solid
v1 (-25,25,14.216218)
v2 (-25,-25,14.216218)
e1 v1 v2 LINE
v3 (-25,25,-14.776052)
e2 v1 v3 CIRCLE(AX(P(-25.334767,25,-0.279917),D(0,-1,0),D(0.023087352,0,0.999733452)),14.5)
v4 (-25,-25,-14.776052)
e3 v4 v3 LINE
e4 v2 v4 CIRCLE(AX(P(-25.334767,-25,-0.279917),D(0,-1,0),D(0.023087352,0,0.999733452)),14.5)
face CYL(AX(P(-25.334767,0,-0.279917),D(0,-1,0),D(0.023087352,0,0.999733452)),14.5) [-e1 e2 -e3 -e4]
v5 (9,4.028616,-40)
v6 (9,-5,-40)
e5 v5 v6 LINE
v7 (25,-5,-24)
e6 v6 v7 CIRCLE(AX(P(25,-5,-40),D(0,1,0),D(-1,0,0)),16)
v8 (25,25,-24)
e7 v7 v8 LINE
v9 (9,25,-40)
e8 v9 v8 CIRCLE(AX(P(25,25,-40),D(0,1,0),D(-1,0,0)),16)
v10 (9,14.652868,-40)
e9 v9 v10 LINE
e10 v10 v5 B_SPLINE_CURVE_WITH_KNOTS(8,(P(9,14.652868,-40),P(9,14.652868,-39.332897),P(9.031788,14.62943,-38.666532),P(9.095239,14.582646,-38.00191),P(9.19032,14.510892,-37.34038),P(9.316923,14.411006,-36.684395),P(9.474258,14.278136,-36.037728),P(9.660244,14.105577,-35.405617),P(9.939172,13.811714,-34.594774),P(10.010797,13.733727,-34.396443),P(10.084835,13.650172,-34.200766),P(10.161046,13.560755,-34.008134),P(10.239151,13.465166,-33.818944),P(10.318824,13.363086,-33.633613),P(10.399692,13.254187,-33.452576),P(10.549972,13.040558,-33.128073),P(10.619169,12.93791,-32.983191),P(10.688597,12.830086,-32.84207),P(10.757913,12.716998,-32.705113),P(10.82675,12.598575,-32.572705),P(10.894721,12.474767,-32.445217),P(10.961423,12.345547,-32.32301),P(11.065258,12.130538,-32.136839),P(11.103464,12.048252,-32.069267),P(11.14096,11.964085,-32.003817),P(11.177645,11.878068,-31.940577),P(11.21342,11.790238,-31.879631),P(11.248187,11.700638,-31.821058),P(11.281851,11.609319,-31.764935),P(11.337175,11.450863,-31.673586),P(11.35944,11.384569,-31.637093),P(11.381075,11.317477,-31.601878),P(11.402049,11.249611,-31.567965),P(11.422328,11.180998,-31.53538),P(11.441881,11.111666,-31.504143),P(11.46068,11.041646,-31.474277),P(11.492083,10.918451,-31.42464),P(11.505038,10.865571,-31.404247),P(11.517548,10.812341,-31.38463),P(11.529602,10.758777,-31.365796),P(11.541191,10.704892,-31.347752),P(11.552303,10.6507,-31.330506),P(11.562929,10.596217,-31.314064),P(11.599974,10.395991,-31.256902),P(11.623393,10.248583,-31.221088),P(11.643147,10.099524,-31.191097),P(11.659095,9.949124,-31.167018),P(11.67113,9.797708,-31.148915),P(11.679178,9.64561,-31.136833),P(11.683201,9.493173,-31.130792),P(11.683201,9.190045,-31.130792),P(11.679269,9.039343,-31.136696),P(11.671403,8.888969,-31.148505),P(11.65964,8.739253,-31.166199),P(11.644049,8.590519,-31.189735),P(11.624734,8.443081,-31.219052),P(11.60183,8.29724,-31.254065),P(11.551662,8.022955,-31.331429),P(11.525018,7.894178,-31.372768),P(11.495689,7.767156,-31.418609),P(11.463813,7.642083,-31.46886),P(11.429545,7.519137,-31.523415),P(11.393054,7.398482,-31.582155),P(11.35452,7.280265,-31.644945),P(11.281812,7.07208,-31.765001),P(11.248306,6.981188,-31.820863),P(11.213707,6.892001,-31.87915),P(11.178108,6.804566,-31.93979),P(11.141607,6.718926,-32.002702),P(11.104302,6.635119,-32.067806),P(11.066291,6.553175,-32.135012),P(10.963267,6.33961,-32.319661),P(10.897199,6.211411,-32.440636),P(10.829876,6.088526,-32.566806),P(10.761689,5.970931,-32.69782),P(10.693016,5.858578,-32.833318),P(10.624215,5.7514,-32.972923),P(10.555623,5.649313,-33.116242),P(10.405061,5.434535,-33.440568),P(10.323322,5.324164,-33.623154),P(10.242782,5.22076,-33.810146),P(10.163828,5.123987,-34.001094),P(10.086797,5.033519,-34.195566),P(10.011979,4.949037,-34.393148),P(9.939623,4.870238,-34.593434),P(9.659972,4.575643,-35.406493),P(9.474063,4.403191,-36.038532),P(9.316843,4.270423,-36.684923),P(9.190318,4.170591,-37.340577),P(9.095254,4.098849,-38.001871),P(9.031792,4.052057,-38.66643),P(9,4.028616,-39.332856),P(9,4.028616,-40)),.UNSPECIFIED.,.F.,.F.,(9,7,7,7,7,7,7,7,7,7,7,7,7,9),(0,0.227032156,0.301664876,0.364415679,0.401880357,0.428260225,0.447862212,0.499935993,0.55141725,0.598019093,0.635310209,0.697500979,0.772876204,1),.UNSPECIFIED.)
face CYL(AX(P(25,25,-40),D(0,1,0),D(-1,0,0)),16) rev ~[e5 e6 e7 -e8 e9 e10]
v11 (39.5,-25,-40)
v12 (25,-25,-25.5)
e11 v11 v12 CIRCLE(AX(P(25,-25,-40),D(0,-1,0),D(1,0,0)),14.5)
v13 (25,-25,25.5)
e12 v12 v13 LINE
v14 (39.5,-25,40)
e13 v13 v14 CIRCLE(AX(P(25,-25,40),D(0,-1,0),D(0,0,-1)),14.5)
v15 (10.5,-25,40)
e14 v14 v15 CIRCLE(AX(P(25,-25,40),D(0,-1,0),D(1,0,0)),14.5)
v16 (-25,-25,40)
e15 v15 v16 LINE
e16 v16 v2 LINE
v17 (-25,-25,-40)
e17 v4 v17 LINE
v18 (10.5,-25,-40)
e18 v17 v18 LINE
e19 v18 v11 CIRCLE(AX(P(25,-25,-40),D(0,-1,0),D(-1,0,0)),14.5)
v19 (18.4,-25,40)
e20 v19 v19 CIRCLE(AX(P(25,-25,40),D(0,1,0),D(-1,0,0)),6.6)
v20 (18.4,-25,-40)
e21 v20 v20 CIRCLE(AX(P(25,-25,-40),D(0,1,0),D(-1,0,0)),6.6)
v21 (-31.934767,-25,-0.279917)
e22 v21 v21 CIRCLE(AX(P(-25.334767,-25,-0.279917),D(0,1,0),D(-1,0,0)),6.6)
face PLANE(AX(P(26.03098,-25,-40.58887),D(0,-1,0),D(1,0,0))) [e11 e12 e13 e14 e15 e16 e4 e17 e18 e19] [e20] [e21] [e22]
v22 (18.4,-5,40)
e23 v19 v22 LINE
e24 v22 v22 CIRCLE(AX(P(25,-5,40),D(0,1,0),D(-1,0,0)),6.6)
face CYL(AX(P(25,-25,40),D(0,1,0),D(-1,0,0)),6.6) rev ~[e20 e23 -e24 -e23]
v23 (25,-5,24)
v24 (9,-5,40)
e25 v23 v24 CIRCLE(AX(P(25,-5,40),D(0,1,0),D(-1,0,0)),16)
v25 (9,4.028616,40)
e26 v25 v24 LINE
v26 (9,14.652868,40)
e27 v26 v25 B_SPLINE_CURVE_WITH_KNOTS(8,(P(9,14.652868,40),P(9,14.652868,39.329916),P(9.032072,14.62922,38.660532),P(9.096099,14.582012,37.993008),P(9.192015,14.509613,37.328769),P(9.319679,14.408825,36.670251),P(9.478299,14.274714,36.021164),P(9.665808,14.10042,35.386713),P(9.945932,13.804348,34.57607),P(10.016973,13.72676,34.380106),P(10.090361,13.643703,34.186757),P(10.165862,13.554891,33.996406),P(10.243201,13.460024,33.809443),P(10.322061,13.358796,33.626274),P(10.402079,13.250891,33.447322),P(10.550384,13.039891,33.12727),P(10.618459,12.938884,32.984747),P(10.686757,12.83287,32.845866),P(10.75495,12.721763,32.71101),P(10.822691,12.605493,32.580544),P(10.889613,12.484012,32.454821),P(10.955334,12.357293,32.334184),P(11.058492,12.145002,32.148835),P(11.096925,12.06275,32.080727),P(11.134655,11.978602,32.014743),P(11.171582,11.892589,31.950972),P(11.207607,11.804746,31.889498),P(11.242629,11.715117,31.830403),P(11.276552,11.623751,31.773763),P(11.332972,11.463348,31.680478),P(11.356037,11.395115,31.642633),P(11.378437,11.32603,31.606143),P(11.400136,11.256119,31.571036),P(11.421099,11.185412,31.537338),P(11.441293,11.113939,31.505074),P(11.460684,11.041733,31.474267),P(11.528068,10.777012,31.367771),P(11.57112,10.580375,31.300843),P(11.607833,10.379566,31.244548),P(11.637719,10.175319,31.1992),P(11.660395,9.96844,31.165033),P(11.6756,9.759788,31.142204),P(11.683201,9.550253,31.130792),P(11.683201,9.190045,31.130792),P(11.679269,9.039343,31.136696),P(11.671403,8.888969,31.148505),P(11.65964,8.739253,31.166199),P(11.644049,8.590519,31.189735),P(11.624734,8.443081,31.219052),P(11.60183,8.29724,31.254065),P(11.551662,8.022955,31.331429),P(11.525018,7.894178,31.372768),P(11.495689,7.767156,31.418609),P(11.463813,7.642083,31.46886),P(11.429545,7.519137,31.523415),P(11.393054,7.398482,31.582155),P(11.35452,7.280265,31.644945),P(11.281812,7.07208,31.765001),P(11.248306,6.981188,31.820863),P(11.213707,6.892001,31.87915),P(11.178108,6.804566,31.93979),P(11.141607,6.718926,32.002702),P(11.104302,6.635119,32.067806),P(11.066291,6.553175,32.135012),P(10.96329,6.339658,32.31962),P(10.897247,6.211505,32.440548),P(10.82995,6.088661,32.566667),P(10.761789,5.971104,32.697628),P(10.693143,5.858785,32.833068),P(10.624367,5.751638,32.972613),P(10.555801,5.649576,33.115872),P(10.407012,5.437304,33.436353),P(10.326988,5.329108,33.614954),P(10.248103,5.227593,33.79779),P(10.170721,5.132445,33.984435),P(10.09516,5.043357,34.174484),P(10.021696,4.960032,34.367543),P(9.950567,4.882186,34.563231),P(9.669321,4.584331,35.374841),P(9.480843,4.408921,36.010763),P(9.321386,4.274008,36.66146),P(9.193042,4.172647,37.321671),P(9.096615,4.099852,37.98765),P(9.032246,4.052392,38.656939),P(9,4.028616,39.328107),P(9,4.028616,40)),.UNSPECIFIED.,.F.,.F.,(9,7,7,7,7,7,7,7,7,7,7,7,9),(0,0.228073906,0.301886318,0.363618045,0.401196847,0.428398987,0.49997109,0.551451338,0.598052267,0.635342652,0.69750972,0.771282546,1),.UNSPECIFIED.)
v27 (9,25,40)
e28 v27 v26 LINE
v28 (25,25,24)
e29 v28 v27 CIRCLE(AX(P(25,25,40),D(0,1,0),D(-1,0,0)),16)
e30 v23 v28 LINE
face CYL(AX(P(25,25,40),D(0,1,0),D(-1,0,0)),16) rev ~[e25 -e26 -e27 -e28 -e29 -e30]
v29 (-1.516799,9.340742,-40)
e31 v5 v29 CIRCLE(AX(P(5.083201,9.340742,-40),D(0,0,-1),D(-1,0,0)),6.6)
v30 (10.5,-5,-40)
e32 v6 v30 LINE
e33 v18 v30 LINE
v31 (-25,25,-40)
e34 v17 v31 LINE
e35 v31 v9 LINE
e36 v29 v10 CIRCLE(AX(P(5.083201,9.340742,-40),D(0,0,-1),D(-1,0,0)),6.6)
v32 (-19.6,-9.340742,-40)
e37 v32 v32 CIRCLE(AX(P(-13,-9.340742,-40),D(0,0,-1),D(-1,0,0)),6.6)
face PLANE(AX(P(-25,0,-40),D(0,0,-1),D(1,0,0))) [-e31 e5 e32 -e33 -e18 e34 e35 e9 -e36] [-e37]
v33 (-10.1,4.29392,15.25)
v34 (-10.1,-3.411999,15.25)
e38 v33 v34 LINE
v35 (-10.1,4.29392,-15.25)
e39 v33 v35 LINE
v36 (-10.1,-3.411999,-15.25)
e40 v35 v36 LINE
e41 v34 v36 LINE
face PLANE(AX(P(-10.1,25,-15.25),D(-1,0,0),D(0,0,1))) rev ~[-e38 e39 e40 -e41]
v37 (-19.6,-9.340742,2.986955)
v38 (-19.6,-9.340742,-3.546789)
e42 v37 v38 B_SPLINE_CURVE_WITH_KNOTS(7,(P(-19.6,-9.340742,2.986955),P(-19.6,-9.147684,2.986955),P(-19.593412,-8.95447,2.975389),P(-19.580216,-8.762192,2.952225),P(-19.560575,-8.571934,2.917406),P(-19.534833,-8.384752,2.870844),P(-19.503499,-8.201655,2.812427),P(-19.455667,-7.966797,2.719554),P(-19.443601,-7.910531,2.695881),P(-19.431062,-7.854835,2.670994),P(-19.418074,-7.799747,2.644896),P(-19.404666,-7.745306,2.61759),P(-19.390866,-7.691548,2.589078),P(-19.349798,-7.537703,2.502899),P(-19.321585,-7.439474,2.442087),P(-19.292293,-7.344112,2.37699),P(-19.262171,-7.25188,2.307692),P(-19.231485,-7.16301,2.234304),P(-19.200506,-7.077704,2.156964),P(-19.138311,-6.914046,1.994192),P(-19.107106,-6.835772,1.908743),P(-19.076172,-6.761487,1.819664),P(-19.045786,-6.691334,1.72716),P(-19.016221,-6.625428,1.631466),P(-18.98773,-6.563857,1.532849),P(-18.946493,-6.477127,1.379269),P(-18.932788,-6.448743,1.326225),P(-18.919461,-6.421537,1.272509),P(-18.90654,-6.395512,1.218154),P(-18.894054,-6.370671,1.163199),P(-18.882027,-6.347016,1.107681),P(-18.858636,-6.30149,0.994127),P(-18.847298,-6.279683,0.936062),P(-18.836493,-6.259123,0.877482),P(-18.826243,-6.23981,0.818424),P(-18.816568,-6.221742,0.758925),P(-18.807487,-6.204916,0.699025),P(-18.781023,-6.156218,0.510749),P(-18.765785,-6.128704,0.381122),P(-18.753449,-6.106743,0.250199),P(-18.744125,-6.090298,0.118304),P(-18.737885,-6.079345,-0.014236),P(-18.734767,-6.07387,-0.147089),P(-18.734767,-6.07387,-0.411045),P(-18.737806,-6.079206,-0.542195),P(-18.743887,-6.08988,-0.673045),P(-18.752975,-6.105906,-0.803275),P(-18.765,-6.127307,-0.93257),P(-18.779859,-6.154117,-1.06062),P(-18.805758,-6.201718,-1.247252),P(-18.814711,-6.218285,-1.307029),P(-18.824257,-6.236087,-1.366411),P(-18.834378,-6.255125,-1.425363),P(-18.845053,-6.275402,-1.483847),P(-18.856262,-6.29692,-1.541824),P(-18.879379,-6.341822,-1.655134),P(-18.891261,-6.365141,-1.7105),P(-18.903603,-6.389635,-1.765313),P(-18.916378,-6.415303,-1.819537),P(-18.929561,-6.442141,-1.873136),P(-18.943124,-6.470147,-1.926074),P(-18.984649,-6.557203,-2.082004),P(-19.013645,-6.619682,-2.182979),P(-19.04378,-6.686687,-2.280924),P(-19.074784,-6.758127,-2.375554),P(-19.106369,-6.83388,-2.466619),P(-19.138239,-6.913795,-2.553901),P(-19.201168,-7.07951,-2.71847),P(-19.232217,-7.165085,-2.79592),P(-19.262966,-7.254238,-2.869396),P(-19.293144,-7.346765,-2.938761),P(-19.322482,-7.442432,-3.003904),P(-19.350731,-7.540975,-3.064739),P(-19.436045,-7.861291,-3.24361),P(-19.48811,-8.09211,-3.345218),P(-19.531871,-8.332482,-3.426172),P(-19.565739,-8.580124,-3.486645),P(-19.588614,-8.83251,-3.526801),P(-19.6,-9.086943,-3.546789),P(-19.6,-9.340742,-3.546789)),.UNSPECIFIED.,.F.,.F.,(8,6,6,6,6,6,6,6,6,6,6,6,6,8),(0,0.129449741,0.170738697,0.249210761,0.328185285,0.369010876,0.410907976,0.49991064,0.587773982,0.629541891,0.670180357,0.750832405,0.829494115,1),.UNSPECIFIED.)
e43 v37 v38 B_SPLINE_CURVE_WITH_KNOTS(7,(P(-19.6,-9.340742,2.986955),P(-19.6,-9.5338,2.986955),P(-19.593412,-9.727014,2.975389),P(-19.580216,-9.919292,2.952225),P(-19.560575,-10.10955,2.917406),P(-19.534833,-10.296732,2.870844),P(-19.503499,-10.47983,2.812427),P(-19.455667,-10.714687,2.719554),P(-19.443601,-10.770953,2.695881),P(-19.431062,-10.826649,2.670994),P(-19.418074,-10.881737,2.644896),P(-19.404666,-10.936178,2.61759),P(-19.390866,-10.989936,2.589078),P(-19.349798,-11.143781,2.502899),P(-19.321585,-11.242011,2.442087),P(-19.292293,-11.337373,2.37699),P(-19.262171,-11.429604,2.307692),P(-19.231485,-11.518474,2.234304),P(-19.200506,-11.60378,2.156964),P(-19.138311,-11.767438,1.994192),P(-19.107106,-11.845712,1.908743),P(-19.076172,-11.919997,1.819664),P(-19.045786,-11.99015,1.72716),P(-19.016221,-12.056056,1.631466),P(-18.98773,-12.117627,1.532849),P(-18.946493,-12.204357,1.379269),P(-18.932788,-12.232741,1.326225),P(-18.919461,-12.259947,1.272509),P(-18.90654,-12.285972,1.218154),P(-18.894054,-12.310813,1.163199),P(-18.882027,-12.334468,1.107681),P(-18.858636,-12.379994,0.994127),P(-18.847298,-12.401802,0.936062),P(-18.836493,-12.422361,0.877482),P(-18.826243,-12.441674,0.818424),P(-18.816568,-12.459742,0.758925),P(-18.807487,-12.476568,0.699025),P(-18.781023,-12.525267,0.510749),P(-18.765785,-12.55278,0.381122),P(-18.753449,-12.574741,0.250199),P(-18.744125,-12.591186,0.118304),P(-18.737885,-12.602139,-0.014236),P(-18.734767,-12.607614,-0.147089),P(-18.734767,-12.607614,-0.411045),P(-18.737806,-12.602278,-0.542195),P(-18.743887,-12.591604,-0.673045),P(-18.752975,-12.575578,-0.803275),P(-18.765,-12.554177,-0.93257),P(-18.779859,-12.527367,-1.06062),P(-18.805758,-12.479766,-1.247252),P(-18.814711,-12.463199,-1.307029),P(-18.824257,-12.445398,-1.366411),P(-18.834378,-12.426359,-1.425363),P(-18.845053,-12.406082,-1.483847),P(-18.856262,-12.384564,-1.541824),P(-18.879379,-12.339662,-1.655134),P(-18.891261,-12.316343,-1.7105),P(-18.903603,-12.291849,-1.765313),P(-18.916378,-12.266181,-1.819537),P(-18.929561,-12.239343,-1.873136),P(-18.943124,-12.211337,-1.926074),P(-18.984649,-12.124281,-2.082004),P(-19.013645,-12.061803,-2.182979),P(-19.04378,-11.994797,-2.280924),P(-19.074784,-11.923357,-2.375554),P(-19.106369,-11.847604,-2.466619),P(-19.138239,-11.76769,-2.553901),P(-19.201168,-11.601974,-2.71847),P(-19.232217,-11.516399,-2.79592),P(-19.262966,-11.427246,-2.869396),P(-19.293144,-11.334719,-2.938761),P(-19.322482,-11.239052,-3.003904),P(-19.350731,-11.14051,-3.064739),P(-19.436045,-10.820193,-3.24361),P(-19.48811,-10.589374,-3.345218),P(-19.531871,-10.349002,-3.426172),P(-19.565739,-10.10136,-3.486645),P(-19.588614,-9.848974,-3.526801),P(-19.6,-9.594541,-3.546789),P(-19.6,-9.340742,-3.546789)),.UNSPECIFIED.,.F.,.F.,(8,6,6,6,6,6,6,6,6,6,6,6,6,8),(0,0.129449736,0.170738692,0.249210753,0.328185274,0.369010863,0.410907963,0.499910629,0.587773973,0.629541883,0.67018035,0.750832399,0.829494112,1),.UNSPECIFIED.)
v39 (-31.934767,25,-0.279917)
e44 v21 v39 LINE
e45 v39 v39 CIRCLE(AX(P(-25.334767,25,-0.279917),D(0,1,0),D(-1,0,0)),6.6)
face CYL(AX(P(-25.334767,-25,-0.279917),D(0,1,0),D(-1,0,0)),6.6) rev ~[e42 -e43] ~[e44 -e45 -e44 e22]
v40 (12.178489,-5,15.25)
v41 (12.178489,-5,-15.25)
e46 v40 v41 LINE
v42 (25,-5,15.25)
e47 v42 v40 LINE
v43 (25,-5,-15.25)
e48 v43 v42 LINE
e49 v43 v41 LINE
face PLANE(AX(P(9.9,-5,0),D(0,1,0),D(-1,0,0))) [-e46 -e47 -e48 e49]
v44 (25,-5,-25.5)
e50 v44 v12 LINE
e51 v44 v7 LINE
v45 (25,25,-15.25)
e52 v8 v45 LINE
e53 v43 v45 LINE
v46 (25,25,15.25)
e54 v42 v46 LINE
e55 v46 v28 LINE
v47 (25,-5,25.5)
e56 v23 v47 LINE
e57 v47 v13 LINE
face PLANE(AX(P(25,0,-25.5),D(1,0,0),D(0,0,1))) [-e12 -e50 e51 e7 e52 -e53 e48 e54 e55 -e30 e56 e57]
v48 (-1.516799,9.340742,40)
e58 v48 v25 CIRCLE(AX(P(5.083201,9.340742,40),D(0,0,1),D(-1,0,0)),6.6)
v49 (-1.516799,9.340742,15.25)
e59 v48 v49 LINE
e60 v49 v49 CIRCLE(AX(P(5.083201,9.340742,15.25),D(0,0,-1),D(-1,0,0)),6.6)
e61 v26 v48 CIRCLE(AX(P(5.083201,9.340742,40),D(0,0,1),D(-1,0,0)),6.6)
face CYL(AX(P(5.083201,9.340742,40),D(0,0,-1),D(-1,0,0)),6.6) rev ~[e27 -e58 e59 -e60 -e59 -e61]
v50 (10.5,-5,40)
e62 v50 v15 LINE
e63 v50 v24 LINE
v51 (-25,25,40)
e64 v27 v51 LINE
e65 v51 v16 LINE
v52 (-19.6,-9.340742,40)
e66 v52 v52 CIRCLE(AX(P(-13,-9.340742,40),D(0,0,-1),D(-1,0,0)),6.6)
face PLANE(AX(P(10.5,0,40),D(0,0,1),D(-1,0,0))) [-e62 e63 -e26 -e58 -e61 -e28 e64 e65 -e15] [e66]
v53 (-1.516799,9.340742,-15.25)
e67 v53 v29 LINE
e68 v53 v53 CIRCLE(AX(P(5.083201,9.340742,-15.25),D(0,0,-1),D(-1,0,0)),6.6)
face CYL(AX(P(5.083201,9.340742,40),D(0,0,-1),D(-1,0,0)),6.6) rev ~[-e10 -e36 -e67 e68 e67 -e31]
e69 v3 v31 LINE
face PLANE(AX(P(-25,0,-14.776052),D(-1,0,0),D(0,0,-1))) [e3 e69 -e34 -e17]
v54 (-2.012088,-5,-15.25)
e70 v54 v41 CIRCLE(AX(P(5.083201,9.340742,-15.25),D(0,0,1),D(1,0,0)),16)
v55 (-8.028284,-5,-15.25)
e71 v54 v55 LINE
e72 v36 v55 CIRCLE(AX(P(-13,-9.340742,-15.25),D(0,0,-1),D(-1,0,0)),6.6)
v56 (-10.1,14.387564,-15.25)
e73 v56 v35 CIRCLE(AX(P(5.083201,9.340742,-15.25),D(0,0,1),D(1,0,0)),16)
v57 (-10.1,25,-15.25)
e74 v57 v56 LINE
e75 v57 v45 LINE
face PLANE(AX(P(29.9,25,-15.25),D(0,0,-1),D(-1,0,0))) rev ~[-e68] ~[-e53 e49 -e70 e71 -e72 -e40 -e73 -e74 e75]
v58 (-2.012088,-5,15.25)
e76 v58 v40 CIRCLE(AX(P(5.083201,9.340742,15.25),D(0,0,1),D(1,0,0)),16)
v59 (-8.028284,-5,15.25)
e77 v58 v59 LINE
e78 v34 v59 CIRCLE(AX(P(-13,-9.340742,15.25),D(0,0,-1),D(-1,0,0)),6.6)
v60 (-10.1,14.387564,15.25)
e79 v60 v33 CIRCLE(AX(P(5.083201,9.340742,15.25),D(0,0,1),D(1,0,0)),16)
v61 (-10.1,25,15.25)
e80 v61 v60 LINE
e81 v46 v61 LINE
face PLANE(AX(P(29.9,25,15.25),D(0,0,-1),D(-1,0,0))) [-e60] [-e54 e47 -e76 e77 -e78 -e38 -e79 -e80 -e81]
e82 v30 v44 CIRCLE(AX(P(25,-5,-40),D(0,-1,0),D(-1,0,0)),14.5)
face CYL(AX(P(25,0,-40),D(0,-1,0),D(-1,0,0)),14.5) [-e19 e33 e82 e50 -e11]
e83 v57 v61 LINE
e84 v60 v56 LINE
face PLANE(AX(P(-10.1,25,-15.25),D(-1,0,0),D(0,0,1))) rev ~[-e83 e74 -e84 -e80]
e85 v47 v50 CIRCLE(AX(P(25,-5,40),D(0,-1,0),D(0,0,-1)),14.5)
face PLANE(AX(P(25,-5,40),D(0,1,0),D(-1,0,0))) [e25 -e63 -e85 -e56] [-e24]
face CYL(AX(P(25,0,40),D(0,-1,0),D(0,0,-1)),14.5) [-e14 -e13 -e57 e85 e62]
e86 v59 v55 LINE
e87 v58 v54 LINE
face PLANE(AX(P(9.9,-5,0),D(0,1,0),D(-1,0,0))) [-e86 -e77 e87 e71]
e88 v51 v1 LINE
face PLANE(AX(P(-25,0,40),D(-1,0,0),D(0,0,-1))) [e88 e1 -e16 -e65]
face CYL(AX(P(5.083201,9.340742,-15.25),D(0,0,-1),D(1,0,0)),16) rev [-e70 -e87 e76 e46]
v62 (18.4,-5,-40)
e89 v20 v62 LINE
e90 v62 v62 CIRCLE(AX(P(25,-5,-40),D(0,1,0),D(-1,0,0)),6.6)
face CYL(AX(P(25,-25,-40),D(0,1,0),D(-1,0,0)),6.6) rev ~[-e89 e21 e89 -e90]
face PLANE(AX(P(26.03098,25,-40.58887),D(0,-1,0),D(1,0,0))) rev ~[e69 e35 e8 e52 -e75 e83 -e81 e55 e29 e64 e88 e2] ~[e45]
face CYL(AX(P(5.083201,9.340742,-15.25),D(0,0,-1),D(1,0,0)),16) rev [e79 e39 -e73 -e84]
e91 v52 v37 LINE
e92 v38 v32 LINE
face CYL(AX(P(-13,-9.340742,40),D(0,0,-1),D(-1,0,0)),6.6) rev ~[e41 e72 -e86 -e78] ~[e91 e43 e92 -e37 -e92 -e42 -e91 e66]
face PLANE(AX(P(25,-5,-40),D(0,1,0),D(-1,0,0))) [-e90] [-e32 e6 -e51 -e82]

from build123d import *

# Parameters (mm, degrees)
F1_DEPTH       = 25
F3_D           = 13.2
F3_CBORE_D     = 19.25
F3_CBORE_DEPTH = 0
F5_D           = 13.2
F5_CBORE_D     = 19.25
F5_CBORE_DEPTH = 0
F6_W           = 40
F6_H           = 30.5
F7_DEPTH       = 30
F8_R           = 16
F9_DEPTH       = 30.5
F10_R          = 16
F11_DEPTH      = 30


with BuildPart() as f1:
    # F0 (on Front) → F1 (new body, symmetric)
    with BuildSketch(Plane.XZ):
        with BuildLine():
            Line((25, -25.5), (25, -40))
            Line((25, -40), (10.5, -40))
            ThreePointArc((10.5, -40), (25, -54.5), (39.5, -40))
            ThreePointArc((39.5, -40), (35.2530483272, -29.7469516728), (25, -25.5))
        make_face()
        with BuildLine():
            Line((10.5, -40), (25, -40))
            Line((25, -40), (25, -25.5))
            ThreePointArc((25, -25.5), (14.7469516728, -29.7469516728), (10.5, -40))
        make_face()
        with BuildLine():
            Line((-25, -40), (10.5, -40))
            ThreePointArc((10.5, -40), (14.7469516728, -29.7469516728), (25, -25.5))
            Line((25, -25.5), (25, 25.5))
            ThreePointArc((25, 25.5), (14.7469516728, 29.7469516728), (10.5, 40))
            Line((10.5, 40), (-25, 40))
            Line((-25, 40), (-25, 14.2162181315))
            ThreePointArc((-25, 14.2162181315), (-14.9640357801, 9.8540823977), (-10.8347666082, -0.279916916))
            ThreePointArc((-10.8347666082, -0.279916916), (-14.9640357801, -10.4139162298), (-25, -14.7760519636))
            Line((-25, -14.7760519636), (-25, -40))
        make_face()
        with BuildLine():
            ThreePointArc((10.5, 40), (14.7469516728, 29.7469516728), (25, 25.5))
            Line((25, 25.5), (25, 40))
            Line((25, 40), (10.5, 40))
        make_face()
        with BuildLine():
            Line((25, 40), (25, 25.5))
            ThreePointArc((25, 25.5), (35.2530483272, 29.7469516728), (39.5, 40))
            ThreePointArc((39.5, 40), (25, 54.5), (10.5, 40))
            Line((10.5, 40), (25, 40))
        make_face()
        with BuildLine():
            ThreePointArc((-25, 14.2162181315), (-39.8347666082, -0.279916916), (-25, -14.7760519636))
            Line((-25, -14.7760519636), (-25, 14.2162181315))
        make_face()
        with BuildLine():
            Line((-25, 14.2162181315), (-25, -14.7760519636))
            ThreePointArc((-25, -14.7760519636), (-14.9640357801, -10.4139162298), (-10.8347666082, -0.279916916))
            ThreePointArc((-10.8347666082, -0.279916916), (-14.9640357801, 9.8540823977), (-25, 14.2162181315))
        make_face()
    extrude(amount=F1_DEPTH, both=True)

    # F3 (through all)
    with Locations(Plane.XZ.offset(25)):
        with Locations((25, 40), (-25.3347666082, -0.279916916), (25, -40)):
            CounterBoreHole(F3_D / 2, F3_CBORE_D / 2, F3_CBORE_DEPTH)

    # F5 (through all)
    with Locations(Plane.XY.offset(40)):
        with Locations((-13, -9.3407420599), (5.0832007976, 9.3407420599)):
            CounterBoreHole(F5_D / 2, F5_CBORE_D / 2, F5_CBORE_DEPTH)

    # F6 (on face) → F7 (cut)
    with BuildSketch(Plane(origin=(0, 25, 0), x_dir=(-1, 0, 0), z_dir=(0, 1, 0))):
        with Locations((-9.9, 0)):
            Rectangle(F6_W, F6_H)
    extrude(amount=-F7_DEPTH, mode=Mode.SUBTRACT)

    # F8 (on face) → F9 (cut)
    with BuildSketch(Plane.XY.offset(-15.25)):
        with Locations((5.0832007976, 9.3407420599)):
            Circle(F8_R)
    extrude(amount=F9_DEPTH, mode=Mode.SUBTRACT)

    # F10 (on face) → F11 (cut)
    with BuildSketch(Plane(origin=(0, 25, 0), x_dir=(-1, 0, 0), z_dir=(0, 1, 0))):
        with Locations((-25, 40)):
            Circle(F10_R)
        with Locations((-25, -40)):
            Circle(F10_R)
    extrude(amount=-F11_DEPTH, mode=Mode.SUBTRACT)


solid = f1.part
